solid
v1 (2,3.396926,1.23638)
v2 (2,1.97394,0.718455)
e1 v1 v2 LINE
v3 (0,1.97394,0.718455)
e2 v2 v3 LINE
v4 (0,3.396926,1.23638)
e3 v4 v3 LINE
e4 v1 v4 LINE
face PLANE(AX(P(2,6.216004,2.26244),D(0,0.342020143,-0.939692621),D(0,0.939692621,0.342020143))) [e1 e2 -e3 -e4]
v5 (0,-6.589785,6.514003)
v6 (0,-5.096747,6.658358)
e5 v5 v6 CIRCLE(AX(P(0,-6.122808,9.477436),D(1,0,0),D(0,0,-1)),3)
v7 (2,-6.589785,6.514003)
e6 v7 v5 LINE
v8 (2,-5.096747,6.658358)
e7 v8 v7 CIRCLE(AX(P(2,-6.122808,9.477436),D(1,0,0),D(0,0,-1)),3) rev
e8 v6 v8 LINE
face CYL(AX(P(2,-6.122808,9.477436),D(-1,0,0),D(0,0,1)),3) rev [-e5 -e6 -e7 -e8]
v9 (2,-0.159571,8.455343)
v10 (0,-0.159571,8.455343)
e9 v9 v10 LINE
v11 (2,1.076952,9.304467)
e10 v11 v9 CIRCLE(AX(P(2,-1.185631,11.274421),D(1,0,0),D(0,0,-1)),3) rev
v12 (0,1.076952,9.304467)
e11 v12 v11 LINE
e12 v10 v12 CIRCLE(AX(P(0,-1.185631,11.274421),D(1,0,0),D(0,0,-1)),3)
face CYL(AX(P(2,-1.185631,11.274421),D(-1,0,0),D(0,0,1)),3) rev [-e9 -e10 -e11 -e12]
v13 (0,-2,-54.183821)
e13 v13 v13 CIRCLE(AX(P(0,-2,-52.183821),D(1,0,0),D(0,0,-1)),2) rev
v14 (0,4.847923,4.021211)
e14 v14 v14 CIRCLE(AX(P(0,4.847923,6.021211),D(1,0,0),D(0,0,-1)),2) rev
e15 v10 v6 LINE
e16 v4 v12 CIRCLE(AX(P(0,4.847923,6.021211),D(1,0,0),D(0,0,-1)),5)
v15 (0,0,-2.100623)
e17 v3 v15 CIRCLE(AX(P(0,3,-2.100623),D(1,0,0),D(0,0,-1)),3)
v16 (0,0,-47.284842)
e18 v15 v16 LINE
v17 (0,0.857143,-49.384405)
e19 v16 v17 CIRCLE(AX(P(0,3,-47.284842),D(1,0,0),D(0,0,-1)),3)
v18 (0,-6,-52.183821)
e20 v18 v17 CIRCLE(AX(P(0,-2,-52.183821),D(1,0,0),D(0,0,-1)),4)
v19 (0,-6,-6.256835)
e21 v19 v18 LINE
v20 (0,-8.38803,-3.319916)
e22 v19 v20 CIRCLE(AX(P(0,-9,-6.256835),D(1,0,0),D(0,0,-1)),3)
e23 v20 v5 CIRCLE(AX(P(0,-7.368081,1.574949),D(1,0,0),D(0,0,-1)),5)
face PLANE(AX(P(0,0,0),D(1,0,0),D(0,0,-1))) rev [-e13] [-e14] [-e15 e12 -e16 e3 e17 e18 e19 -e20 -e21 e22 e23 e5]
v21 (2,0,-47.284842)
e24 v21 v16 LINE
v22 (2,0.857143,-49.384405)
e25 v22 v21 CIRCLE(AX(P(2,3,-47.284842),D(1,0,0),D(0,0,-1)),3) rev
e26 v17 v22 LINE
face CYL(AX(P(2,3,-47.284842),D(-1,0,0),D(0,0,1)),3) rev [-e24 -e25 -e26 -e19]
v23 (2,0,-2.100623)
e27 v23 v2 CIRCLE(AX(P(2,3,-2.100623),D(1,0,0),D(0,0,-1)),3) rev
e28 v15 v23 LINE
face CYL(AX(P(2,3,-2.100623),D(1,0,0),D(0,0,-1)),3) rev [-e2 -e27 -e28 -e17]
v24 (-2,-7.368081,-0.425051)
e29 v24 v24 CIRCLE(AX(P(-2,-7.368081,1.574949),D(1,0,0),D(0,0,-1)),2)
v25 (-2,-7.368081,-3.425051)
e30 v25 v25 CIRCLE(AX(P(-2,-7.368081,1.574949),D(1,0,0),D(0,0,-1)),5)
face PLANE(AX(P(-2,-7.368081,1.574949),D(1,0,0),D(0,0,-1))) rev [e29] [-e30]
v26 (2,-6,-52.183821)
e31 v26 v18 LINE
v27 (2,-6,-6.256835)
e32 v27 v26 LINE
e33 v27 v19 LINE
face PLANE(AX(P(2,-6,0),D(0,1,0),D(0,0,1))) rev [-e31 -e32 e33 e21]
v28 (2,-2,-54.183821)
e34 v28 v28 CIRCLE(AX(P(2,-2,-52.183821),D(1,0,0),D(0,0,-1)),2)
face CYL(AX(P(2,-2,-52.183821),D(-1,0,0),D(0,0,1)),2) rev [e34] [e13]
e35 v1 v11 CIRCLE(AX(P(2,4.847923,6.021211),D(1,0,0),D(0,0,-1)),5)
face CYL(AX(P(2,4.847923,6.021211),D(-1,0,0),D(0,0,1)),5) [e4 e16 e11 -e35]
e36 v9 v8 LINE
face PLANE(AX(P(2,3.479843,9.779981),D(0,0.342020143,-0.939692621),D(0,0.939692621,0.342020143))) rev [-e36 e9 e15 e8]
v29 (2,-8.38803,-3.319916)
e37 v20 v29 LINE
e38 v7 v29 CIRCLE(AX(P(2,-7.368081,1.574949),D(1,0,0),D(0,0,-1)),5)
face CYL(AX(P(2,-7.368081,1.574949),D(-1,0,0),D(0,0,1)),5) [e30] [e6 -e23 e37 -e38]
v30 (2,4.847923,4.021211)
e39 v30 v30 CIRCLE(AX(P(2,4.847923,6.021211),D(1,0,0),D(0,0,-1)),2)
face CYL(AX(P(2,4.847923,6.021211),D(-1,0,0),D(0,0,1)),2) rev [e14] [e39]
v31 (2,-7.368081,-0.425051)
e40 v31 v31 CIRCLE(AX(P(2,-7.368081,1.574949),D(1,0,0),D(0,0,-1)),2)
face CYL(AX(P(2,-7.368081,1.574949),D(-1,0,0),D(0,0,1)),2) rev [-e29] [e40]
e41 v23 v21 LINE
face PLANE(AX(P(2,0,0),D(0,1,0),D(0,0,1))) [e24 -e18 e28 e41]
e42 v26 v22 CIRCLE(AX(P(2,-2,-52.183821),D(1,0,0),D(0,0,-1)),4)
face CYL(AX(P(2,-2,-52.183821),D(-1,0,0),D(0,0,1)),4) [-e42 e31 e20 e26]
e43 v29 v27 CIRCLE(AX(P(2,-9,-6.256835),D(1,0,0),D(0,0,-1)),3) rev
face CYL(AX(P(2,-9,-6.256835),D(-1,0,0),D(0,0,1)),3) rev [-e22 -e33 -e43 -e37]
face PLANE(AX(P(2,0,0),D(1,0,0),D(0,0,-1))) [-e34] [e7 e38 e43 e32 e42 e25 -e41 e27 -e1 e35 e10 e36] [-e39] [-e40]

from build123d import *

# Parameters (mm, degrees)
EXTRUDE_1_DEPTH          = 2
EXTRUDE_START            = -2
SKETCH_1_4_R             = 5
EXTRUDE_2_DEPTH          = 2
CUT_EXTRUDE_1_DEPTH      = 58.563801167
CUT_EXTRUDE_1_DEPTH_BACK = 58.563801167
SKETCH_1_3_R             = 2
FILLET_1_R               = 3


with BuildPart() as part:
    # 草图1 → 凸台-拉伸1 (new body)
    with BuildSketch(Plane(origin=(0, 0, 0), x_dir=(0, 0, -1), z_dir=(1, 0, 0))):
        with BuildLine():
            Line((48.71971979, 0), (0, 0))
            Line((0, 0), (1.157760976, -3.180922138))
            ThreePointArc((1.157760976, -3.180922138), (2.450828184, -4.402761461), (3.234245818, -6))
            Line((3.234245818, -6), (52.183821406, -6))
            ThreePointArc((52.183821406, -6), (48.71971979, -4), (48.71971979, 0))
        make_face()
        with BuildLine():
            Line((1.157760976, -3.180922138), (0, 0))
            Line((0, 0), (-1.236380028, 3.396926208))
            ThreePointArc((-1.236380028, 3.396926208), (-4.311110224, 0.149460393), (-8.753920994, 0.660765061))
            Line((-8.753920994, 0.660765061), (-6.359779991, -5.917083284))
            ThreePointArc((-6.359779991, -5.917083284), (-3.285049794, -2.669617469), (1.157760976, -3.180922138))
        make_face()
        with BuildLine():
            ThreePointArc((56.183821406, -2), (53.219097586, 1.863703305), (48.71971979, 0))
            Line((48.71971979, 0), (52.183821406, 0))
            ThreePointArc((52.183821406, 0), (53.598034968, -0.585786438), (54.183821406, -2))
            ThreePointArc((54.183821406, -2), (53.598034968, -3.414213562), (52.183821406, -4))
            Line((52.183821406, -4), (52.183821406, -6))
            ThreePointArc((52.183821406, -6), (55.01224853, -4.828427125), (56.183821406, -2))
        make_face()
        with BuildLine():
            Line((52.183821406, 0), (48.71971979, 0))
            ThreePointArc((48.71971979, 0), (48.71971979, -4), (52.183821406, -6))
            Line((52.183821406, -6), (52.183821406, -4))
            ThreePointArc((52.183821406, -4), (50.183821406, -2), (52.183821406, 0))
        make_face()
        with BuildLine():
            ThreePointArc((3.234245818, -6), (2.450828184, -4.402761461), (1.157760976, -3.180922138))
            Line((1.157760976, -3.180922138), (2.183821406, -6))
            Line((2.183821406, -6), (3.234245818, -6))
        make_face()
        with BuildLine():
            Line((2.183821406, -6), (1.157760976, -3.180922138))
            ThreePointArc((1.157760976, -3.180922138), (-3.285049794, -2.669617469), (-6.359779991, -5.917083284))
            Line((-6.359779991, -5.917083284), (-5.333719561, -8.736161147))
            Line((-5.333719561, -8.736161147), (-3.454334319, -8.05212086))
            ThreePointArc((-3.454334319, -8.05212086), (-2.258989364, -5.488695332), (0.304436164, -6.684040287))
            Line((0.304436164, -6.684040287), (2.183821406, -6))
        make_face()
        with BuildLine():
            ThreePointArc((-8.753920994, 0.660765061), (-4.311110224, 0.149460393), (-1.236380028, 3.396926208))
            Line((-1.236380028, 3.396926208), (-2.262440458, 6.21600407))
            Line((-2.262440458, 6.21600407), (-4.141825699, 5.531963784))
            ThreePointArc((-4.141825699, 5.531963784), (-4.051595435, 5.195219852), (-4.021210941, 4.847923497))
            ThreePointArc((-4.021210941, 4.847923497), (-5.673914585, 2.878307991), (-7.900596182, 4.16388321))
            Line((-7.900596182, 4.16388321), (-9.779981424, 3.479842924))
            Line((-9.779981424, 3.479842924), (-8.753920994, 0.660765061))
        make_face()
        with BuildLine():
            Line((-2.262440458, 6.21600407), (-1.236380028, 3.396926208))
            ThreePointArc((-1.236380028, 3.396926208), (-1.075295729, 4.114491348), (-1.021210941, 4.847923497))
            ThreePointArc((-1.021210941, 4.847923497), (-8.402014349, 9.244714956), (-8.753920994, 0.660765061))
            Line((-8.753920994, 0.660765061), (-9.779981424, 3.479842924))
            Line((-9.779981424, 3.479842924), (-7.900596182, 4.16388321))
            ThreePointArc((-7.900596182, 4.16388321), (-6.705251227, 6.727308738), (-4.141825699, 5.531963784))
            Line((-4.141825699, 5.531963784), (-2.262440458, 6.21600407))
        make_face()
        with BuildLine():
            ThreePointArc((54.183821406, -2), (53.598034968, -0.585786438), (52.183821406, 0))
            Line((52.183821406, 0), (52.183821406, -4))
            ThreePointArc((52.183821406, -4), (53.598034968, -3.414213562), (54.183821406, -2))
        make_face()
        with BuildLine():
            Line((52.183821406, -4), (52.183821406, 0))
            ThreePointArc((52.183821406, 0), (50.183821406, -2), (52.183821406, -4))
        make_face()
        with BuildLine():
            Line((3.234245818, -6), (2.183821406, -6))
            Line((2.183821406, -6), (0.304436164, -6.684040287))
            ThreePointArc((0.304436164, -6.684040287), (0.394666428, -7.020784218), (0.425050922, -7.368080573))
            ThreePointArc((0.425050922, -7.368080573), (-1.227652722, -9.337696079), (-3.454334319, -8.05212086))
            Line((-3.454334319, -8.05212086), (-5.333719561, -8.736161147))
            Line((-5.333719561, -8.736161147), (-6.359779991, -5.917083284))
            ThreePointArc((-6.359779991, -5.917083284), (-2.308381227, -12.313995785), (3.425050922, -7.368080573))
            ThreePointArc((3.425050922, -7.368080573), (3.377119908, -6.677419469), (3.234245818, -6))
        make_face()
        with BuildLine():
            ThreePointArc((0.425050922, -7.368080573), (0.394666428, -7.020784218), (0.304436164, -6.684040287))
            Line((0.304436164, -6.684040287), (-3.454334319, -8.05212086))
            ThreePointArc((-3.454334319, -8.05212086), (-1.227652722, -9.337696079), (0.425050922, -7.368080573))
        make_face()
        with BuildLine():
            Line((-3.454334319, -8.05212086), (0.304436164, -6.684040287))
            ThreePointArc((0.304436164, -6.684040287), (-2.258989364, -5.488695332), (-3.454334319, -8.05212086))
        make_face()
        with BuildLine():
            ThreePointArc((-4.021210941, 4.847923497), (-4.051595435, 5.195219852), (-4.141825699, 5.531963784))
            Line((-4.141825699, 5.531963784), (-7.900596182, 4.16388321))
            ThreePointArc((-7.900596182, 4.16388321), (-5.673914585, 2.878307991), (-4.021210941, 4.847923497))
        make_face()
        with BuildLine():
            Line((-7.900596182, 4.16388321), (-4.141825699, 5.531963784))
            ThreePointArc((-4.141825699, 5.531963784), (-6.705251227, 6.727308738), (-7.900596182, 4.16388321))
        make_face()
    extrude(amount=EXTRUDE_1_DEPTH)

    # 草图1<4> → 凸台-拉伸2 (add)
    with BuildSketch(Plane(origin=(0, 0, 0), x_dir=(0, 0, -1), z_dir=(1, 0, 0)).offset(EXTRUDE_START)):
        with Locations(Location((-1.574949078, -7.368080573, 0), (0, 0, 163.130102354))):
            Circle(SKETCH_1_4_R)
    extrude(amount=EXTRUDE_2_DEPTH)

    # 草图1<3> → 切除-拉伸1 (cut, two sides: drawn at the far end of the back side and taken through both)
    with BuildSketch(Plane(origin=(0, 0, 0), x_dir=(0, 0, -1), z_dir=(1, 0, 0)).offset(-CUT_EXTRUDE_1_DEPTH_BACK)):
        with Locations((-6.021210941, 4.847923497)):
            Circle(SKETCH_1_3_R)
        with Locations((52.183821406, -2)):
            Circle(SKETCH_1_3_R)
        with Locations((-1.574949078, -7.368080573)):
            Circle(SKETCH_1_3_R)
    extrude(amount=CUT_EXTRUDE_1_DEPTH + CUT_EXTRUDE_1_DEPTH_BACK, mode=Mode.SUBTRACT)

    # 圆角1
    # the kernel refuses this fillet: 3 mm, written as the material it adds along each edge
    with BuildSketch(Plane(origin=(0, -6, -3.234245818), x_dir=(0, 0, -1), z_dir=(1, 0, 0))) as fillet_1_piece_1:
        with BuildLine():
            CenterArc((3.022589, -3), FILLET_1_R, 90, 78.229623191)
            ThreePointArc((0.085670039, -2.388030215), (0.187590709, -1.18882203), (0, 0))
            Line((0, 0), (3.022589, 0))
        make_face()
    extrude(amount=2)
    with BuildSketch(Plane(origin=(0, 0, 0), x_dir=(0, 0, -1), z_dir=(1, 0, 0))) as fillet_1_piece_2:
        with BuildLine():
            CenterArc((FILLET_1_R * 0.70020753821, FILLET_1_R), FILLET_1_R, 200, 70)
            Line((-FILLET_1_R * 0.239485082576, FILLET_1_R * 0.657979856674), (0, 0))
            Line((0, 0), (FILLET_1_R * 0.70020753821, 0))
        make_face()
    extrude(amount=2)
    with BuildSketch(Plane(origin=(0, 0, -48.71971979), x_dir=(0, 0, 1), z_dir=(1, 0, 0))) as fillet_1_piece_3:
        with BuildLine():
            CenterArc((1.43487787, -3), FILLET_1_R, 90, 44.415308597)
            ThreePointArc((-0.664684766, -0.857142857), (-0.303154074, -0.451205957), (0, 0))
            Line((0, 0), (1.43487787, 0))
        make_face()
    extrude(amount=2)
    with BuildSketch(Plane(origin=(0, 0.660765061, 8.753920994), x_dir=(0, 0.6030345104353418, 0.7977150990322344), z_dir=(1, 0, 0))) as fillet_1_piece_4:
        with BuildLine():
            CenterArc((0.897200113, 2.992846785), FILLET_1_R, 237.087538991, 28.955024372)
            Line((-0.732871014, 0.474341649), (0, 0))
            ThreePointArc((0, 0), (0.345076967, 0.011922025), (0.690153933, 0))
        make_face()
    extrude(amount=2)
    with BuildSketch(Plane(origin=(0, -5.917083284, 6.359779991), x_dir=(0, -0.974712617445799, 0.2234621072843435), z_dir=(1, 0, 0))) as fillet_1_piece_5:
        with BuildLine():
            CenterArc((0.897200113, -2.992846785), FILLET_1_R, 93.957436637, 28.955024372)
            Line((-0.732871014, -0.474341649), (0, 0))
            ThreePointArc((0, 0), (0.345076967, -0.011922025), (0.690153933, 0))
        make_face()
    extrude(amount=2)


solid = part.part
